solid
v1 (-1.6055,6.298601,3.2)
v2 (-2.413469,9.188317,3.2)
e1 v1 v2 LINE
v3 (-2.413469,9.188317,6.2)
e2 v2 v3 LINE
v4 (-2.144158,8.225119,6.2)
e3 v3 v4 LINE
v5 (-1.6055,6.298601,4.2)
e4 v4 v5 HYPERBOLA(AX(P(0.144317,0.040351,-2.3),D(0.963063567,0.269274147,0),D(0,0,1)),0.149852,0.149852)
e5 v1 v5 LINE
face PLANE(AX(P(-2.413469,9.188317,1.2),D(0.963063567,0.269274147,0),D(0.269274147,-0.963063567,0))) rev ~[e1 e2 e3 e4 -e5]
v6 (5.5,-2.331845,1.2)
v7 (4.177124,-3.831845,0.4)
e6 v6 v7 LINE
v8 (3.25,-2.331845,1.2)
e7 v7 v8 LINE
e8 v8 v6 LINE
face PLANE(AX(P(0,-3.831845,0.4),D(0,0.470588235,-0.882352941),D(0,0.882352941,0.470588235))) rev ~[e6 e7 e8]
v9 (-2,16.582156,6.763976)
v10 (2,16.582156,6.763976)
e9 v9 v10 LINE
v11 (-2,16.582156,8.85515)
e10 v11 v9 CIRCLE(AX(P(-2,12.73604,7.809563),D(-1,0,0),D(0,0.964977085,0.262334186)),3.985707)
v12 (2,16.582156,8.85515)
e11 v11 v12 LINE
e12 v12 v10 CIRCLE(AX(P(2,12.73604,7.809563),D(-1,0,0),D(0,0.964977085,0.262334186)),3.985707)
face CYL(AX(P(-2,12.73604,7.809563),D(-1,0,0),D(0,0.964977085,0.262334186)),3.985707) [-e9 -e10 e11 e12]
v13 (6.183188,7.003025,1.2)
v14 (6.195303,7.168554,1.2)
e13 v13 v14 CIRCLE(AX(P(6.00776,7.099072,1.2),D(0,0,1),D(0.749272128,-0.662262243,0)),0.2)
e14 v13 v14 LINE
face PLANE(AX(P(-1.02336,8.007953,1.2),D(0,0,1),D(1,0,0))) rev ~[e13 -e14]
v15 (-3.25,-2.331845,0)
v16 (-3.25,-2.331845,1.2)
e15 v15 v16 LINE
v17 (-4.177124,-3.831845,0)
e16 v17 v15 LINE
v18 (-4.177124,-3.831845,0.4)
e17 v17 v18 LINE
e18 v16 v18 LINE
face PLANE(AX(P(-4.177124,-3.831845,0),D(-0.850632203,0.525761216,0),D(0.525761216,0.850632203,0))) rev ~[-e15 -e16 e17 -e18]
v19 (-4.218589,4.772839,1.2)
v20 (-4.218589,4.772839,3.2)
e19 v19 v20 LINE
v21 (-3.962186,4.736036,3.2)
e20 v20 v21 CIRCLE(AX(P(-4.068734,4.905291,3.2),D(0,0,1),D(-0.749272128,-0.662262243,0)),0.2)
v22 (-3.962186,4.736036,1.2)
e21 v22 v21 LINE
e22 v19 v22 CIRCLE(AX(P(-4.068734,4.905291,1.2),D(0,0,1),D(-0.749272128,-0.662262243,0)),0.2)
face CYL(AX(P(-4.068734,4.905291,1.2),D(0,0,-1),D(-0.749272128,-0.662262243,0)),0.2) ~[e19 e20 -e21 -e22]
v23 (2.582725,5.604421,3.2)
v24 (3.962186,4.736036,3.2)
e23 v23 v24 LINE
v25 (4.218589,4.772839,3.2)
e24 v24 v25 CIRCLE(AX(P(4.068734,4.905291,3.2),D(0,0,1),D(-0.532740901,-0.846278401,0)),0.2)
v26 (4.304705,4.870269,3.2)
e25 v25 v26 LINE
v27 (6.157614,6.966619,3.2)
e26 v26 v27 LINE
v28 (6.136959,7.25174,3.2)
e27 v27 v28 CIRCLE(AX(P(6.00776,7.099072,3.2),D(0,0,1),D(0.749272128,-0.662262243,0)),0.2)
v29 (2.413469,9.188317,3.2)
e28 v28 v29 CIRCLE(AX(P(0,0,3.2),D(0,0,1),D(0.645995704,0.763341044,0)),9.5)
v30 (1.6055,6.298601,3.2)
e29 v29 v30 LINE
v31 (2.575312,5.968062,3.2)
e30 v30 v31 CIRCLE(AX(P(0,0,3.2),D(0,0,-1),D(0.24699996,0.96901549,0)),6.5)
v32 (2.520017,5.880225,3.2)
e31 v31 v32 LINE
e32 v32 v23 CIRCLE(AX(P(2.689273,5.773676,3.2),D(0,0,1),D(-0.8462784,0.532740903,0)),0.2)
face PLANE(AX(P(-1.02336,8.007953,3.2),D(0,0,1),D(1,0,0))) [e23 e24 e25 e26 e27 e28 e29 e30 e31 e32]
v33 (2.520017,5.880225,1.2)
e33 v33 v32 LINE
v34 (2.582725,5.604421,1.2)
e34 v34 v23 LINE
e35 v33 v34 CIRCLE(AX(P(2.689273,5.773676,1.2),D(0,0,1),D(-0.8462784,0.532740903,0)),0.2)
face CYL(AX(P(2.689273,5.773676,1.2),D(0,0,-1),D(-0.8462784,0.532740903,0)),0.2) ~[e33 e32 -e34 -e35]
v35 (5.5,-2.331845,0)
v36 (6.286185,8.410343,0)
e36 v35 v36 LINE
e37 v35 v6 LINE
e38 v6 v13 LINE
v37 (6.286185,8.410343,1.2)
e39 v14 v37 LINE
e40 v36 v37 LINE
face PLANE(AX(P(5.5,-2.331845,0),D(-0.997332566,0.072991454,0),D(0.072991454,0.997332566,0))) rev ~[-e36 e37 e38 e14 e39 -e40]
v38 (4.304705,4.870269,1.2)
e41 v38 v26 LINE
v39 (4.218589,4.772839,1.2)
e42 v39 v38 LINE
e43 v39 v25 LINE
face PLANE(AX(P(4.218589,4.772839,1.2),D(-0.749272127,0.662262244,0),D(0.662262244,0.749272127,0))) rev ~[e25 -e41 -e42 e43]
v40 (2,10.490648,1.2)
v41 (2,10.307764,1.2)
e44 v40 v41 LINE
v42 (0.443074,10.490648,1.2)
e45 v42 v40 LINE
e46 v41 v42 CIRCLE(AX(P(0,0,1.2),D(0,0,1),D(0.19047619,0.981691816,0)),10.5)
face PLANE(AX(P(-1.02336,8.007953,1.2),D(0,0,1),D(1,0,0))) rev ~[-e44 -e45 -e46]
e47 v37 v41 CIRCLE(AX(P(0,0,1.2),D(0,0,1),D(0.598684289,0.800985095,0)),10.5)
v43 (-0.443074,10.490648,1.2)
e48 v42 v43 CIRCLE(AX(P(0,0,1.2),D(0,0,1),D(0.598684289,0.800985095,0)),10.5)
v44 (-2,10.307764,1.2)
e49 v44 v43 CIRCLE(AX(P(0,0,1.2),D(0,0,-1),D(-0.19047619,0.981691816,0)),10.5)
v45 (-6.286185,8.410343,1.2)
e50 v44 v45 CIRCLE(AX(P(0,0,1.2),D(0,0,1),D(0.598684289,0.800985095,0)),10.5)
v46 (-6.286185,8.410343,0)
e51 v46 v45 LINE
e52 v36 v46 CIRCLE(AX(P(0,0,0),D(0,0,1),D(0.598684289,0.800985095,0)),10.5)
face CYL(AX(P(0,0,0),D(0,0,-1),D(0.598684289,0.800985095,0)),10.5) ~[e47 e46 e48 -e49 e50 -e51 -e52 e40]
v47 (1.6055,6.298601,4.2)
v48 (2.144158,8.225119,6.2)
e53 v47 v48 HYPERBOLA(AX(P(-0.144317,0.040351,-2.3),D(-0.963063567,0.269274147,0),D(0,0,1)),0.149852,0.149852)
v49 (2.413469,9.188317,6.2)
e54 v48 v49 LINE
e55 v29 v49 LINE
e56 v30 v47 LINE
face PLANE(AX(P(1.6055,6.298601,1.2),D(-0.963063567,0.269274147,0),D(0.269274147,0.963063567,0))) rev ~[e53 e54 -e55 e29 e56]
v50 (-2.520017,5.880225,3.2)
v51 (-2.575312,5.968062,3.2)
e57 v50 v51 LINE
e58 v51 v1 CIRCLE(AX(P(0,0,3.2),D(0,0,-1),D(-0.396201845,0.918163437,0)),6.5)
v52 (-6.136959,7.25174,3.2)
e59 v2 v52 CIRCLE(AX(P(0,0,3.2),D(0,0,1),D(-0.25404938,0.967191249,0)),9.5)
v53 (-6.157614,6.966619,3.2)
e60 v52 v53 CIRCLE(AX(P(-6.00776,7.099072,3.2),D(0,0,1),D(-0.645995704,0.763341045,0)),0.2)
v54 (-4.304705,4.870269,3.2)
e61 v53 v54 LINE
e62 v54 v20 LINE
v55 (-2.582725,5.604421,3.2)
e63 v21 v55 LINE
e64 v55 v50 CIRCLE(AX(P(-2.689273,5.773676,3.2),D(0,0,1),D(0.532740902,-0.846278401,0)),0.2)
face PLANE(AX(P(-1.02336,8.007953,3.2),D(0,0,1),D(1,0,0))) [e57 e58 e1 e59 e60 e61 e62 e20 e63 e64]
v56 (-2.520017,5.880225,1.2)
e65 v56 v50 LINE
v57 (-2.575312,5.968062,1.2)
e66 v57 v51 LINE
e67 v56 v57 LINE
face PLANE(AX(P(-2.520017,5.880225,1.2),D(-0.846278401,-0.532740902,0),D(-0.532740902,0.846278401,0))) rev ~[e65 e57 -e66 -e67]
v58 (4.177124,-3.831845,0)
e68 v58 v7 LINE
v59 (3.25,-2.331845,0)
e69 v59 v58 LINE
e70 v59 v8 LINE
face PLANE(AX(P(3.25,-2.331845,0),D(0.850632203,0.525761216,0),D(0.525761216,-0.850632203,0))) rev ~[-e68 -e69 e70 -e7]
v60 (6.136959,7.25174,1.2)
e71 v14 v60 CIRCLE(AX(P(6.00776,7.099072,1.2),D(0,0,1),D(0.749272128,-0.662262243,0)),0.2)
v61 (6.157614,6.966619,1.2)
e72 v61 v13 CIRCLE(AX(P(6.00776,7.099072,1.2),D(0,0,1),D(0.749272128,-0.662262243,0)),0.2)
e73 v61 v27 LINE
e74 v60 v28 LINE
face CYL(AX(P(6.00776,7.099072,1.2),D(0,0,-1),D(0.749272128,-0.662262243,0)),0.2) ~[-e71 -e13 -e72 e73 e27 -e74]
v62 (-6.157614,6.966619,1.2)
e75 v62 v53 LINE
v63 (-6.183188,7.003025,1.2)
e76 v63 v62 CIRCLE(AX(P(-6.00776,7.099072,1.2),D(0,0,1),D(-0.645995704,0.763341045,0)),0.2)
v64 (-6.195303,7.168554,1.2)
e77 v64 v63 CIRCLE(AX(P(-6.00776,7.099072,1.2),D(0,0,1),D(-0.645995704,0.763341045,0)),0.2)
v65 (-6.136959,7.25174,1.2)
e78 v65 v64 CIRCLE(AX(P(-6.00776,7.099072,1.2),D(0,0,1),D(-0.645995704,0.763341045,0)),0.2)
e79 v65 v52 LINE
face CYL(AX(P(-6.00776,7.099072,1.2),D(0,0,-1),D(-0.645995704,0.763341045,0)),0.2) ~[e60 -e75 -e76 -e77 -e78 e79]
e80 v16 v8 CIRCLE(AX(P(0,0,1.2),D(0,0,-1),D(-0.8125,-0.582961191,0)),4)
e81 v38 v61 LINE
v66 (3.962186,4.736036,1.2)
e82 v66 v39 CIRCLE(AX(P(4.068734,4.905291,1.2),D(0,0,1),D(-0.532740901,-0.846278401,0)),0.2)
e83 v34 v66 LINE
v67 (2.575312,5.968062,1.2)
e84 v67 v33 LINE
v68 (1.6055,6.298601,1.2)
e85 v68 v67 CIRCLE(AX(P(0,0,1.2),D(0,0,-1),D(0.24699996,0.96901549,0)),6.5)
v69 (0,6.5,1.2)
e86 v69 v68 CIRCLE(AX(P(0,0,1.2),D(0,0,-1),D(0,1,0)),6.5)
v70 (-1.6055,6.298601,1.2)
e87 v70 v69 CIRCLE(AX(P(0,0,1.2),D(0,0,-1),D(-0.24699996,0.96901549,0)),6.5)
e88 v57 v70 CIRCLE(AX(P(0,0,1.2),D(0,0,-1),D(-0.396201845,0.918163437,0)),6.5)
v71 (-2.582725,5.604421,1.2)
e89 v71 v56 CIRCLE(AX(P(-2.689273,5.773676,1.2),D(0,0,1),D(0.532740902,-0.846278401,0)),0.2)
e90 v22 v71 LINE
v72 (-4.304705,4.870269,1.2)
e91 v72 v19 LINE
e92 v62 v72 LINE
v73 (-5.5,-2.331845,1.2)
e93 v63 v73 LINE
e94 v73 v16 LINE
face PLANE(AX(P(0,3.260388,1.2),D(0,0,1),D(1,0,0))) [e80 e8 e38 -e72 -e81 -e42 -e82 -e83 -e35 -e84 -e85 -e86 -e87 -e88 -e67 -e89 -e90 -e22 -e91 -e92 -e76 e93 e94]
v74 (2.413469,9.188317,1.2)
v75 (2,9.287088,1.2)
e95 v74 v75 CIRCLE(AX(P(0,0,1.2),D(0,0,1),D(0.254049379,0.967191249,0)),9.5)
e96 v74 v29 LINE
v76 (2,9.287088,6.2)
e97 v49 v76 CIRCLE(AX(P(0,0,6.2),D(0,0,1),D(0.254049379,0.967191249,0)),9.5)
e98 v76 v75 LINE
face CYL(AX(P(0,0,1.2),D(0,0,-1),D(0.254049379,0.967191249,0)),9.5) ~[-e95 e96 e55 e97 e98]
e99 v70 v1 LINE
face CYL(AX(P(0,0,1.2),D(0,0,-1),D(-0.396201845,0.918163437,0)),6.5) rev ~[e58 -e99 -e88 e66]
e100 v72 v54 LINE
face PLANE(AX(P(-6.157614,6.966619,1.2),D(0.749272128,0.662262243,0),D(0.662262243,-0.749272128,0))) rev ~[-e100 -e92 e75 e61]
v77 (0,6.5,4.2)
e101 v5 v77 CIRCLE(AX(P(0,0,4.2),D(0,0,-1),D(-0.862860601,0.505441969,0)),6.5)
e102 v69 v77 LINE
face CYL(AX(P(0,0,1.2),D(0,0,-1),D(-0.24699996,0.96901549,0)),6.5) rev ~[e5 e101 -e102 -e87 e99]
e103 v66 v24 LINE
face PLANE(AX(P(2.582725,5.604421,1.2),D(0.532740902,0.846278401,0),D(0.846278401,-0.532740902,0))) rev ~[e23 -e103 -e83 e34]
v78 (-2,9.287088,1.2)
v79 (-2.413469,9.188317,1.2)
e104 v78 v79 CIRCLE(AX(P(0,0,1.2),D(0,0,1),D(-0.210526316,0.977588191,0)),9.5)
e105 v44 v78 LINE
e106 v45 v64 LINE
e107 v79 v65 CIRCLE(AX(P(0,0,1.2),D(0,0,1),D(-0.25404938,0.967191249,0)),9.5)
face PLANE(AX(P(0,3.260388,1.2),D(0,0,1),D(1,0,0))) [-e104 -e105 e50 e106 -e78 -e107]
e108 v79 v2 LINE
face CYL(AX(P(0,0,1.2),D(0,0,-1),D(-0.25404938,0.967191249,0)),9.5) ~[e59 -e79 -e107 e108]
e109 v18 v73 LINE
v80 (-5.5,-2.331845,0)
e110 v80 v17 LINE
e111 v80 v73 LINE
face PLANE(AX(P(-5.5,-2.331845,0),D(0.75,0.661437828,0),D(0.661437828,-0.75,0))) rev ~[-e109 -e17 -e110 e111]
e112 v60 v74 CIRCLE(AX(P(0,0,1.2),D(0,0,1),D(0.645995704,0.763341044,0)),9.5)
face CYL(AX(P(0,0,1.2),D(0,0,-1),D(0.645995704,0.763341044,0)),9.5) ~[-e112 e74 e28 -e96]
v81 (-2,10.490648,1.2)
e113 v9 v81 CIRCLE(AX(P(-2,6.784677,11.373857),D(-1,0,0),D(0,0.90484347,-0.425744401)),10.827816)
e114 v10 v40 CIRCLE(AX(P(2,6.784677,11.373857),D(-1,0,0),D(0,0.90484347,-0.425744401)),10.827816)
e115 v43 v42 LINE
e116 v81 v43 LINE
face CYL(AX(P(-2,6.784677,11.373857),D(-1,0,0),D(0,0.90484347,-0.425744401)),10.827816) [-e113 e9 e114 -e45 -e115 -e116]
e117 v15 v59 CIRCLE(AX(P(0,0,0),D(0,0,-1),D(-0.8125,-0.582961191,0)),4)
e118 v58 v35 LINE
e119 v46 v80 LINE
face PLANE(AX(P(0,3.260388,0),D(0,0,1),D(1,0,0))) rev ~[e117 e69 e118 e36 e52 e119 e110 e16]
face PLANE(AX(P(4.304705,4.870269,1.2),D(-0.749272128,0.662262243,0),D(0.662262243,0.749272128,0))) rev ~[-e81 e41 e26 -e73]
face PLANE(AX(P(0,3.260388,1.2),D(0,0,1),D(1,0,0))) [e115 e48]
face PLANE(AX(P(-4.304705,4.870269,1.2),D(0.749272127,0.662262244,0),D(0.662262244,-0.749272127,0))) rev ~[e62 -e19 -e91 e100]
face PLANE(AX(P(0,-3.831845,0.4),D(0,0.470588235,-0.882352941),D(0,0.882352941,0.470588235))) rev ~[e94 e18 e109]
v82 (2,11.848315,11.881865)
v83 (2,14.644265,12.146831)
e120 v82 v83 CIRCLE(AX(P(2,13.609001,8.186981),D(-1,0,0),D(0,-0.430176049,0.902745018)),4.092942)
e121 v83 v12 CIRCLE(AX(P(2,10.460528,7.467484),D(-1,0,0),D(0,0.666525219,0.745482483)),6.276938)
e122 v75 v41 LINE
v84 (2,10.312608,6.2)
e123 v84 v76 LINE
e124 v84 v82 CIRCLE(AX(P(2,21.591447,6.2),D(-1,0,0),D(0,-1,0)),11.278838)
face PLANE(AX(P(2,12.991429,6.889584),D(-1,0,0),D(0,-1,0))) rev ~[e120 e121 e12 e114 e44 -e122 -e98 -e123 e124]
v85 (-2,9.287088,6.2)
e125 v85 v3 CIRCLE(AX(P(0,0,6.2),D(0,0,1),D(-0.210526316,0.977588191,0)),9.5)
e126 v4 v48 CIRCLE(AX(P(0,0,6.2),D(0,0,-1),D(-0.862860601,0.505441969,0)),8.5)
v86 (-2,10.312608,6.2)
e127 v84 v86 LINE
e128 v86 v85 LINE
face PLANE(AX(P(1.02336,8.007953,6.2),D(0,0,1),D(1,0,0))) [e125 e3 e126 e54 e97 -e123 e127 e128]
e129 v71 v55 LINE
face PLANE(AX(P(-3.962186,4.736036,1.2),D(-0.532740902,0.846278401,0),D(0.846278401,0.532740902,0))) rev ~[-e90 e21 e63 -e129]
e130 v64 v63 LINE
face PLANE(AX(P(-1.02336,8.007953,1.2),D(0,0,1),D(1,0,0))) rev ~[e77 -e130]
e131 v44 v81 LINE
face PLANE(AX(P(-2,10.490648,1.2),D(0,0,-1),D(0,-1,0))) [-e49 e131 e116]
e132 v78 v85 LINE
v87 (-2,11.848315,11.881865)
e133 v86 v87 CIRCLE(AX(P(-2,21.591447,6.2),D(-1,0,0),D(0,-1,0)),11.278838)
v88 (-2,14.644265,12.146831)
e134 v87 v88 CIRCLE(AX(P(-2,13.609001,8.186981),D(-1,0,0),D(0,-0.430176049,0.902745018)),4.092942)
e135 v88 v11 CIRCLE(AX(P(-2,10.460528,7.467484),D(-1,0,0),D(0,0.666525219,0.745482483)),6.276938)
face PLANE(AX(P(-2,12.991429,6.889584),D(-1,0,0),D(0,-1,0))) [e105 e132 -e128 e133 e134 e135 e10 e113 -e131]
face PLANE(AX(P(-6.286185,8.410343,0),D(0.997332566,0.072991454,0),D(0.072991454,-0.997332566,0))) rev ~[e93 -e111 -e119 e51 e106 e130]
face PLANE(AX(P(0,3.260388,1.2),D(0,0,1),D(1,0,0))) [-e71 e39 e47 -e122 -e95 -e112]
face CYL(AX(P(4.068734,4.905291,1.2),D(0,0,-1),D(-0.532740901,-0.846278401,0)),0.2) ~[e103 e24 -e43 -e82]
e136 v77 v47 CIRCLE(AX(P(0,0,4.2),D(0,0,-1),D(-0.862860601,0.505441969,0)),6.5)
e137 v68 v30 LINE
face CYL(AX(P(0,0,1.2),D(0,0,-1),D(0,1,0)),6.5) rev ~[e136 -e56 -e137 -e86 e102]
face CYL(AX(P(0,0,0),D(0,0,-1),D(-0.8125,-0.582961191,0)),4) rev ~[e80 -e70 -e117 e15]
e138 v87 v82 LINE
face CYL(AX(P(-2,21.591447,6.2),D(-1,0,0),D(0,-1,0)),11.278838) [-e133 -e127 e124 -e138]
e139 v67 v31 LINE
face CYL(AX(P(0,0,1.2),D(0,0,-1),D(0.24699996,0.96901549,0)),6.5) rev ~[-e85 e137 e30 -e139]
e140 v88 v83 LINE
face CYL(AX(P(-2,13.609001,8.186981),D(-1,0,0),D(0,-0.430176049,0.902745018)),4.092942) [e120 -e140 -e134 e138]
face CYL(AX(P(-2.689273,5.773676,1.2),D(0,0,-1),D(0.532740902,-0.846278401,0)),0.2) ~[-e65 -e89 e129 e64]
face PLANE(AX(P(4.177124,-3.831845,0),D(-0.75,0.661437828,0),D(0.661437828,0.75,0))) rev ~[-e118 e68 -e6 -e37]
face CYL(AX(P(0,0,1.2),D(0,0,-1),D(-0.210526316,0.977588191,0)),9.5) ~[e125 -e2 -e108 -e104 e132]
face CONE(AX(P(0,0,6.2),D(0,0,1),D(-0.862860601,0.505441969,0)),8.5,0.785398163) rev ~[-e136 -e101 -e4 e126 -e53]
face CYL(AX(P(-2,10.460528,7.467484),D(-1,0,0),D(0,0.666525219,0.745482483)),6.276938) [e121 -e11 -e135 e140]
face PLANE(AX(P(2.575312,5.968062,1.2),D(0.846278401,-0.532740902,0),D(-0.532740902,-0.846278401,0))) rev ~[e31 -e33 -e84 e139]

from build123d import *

# Parameters (mm, degrees)
F1_DEPTH    = 1.2
F3_DEPTH    = 12.5
F5_DEPTH    = 2
F6_DEPTH    = 5
F7_T2_ANGLE = 119.2786087223
F8_DEPTH    = 5
F10_DEPTH   = 4
F11_DEPTH   = 5


# Not quite as in the source:
# - a fillet or chamfer that OpenCascade refuses, or shapes differently, is made with other operations: its cross-section is extruded or revolved along the edge and cut away or added
# - a feature names something its author has since deleted; it is built from what else it names


with BuildPart() as f1:
    # F0 (on Top) → F1 (new body)
    with BuildSketch(Plane.XY):
        with BuildLine():
            ThreePointArc((-3.25, -2.3318447633), (0, 4), (3.25, -2.3318447633))
            Line((3.25, -2.3318447633), (4.1771243445, -3.8318447633))
            Line((4.1771243445, -3.8318447633), (5.5, -2.3318447633))
            Line((5.5, -2.3318447633), (6.2861850371, 8.4103434936))
            ThreePointArc((6.2861850371, 8.4103434936), (0, 10.5), (-6.2861850371, 8.4103434936))
            Line((-6.2861850371, 8.4103434936), (-5.5, -2.3318447633))
            Line((-5.5, -2.3318447633), (-4.1771243445, -3.8318447633))
            Line((-4.1771243445, -3.8318447633), (-3.25, -2.3318447633))
        make_face()
    extrude(amount=F1_DEPTH)

    # F2 (on Right) → F3 (cut, symmetric)
    with BuildSketch(Plane.YZ):
        Polygon((-3.8318447633, 0.4), (-2.3318447633, 1.2), (-3.8318447633, 1.2), align=None)
    extrude(amount=F3_DEPTH, both=True, mode=Mode.SUBTRACT)

    # F4 (on face) → F5 (join)
    with BuildSketch(Plane.XY.offset(1.2)):
        with BuildLine():
            Line((0, 9.4893432962), (0, 9.5))
            ThreePointArc((0, 9.5), (-1.0056504861, 9.4466219941), (-2, 9.2870878105))
            ThreePointArc((-2, 9.2870878105), (-2.207287093, 9.2400153511), (-2.4134691055, 9.1883168686))
            Line((-2.4134691055, 9.1883168686), (-1.6054997382, 6.2986006851))
            ThreePointArc((-1.6054997382, 6.2986006851), (-0.809041268, 6.4494536378), (0, 6.5))
            Line((0, 6.5), (0, 9.4893432962))
        make_face()
        with BuildLine():
            Line((0, 10.3126084432), (0, 9.5))
            ThreePointArc((0, 9.5), (1.0056504861, 9.4466219941), (2, 9.2870878105))
            Line((2, 9.2870878105), (2, 10.3126084432))
            Line((2, 10.3126084432), (0, 10.3126084432))
        make_face()
        with BuildLine():
            ThreePointArc((2, 9.2870878105), (1.0056504861, 9.4466219941), (0, 9.5))
            Line((0, 9.5), (0, 9.4893432962))
            Line((0, 9.4893432962), (0, 6.5))
            ThreePointArc((0, 6.5), (0.809041268, 6.4494536378), (1.6054997382, 6.2986006851))
            Line((1.6054997382, 6.2986006851), (2.4134691055, 9.1883168686))
            ThreePointArc((2.4134691055, 9.1883168686), (2.207287093, 9.2400153511), (2, 9.2870878105))
        make_face()
        with BuildLine():
            ThreePointArc((-2, 9.2870878105), (-1.0056504861, 9.4466219941), (0, 9.5))
            Line((0, 9.5), (0, 10.3126084432))
            Line((0, 10.3126084432), (-2, 10.3126084432))
            Line((-2, 10.3126084432), (-2, 9.2870878105))
        make_face()
        with BuildLine():
            Line((-1.6054997382, 6.2986006851), (-2.4134691055, 9.1883168686))
            ThreePointArc((-2.4134691055, 9.1883168686), (-4.3834961594, 8.4282240965), (-6.1369591907, 7.2517399217))
            ThreePointArc((-6.1369591907, 7.2517399217), (-6.2072372931, 7.1135226449), (-6.1576144754, 6.9666192642))
            Line((-6.1576144754, 6.9666192642), (-4.3047045796, 4.8702688306))
            Line((-4.3047045796, 4.8702688306), (-4.2185888433, 4.7728389657))
            ThreePointArc((-4.2185888433, 4.7728389657), (-4.0971505607, 4.7073203992), (-3.9621862374, 4.7360357341))
            Line((-3.9621862374, 4.7360357341), (-2.5827247856, 5.6044208159))
            ThreePointArc((-2.5827247856, 5.6044208159), (-2.4942501859, 5.7293355978), (-2.5200172859, 5.8802246764))
            Line((-2.5200172859, 5.8802246764), (-2.5753119947, 5.968062343))
            ThreePointArc((-2.5753119947, 5.968062343), (-2.096928846, 6.152470188), (-1.6054997382, 6.2986006851))
        make_face()
        with BuildLine():
            ThreePointArc((6.1369591907, 7.2517399217), (4.3834961594, 8.4282240965), (2.4134691055, 9.1883168686))
            Line((2.4134691055, 9.1883168686), (1.6054997382, 6.2986006851))
            ThreePointArc((1.6054997382, 6.2986006851), (2.096928846, 6.152470188), (2.5753119947, 5.968062343))
            Line((2.5753119947, 5.968062343), (2.5200172859, 5.8802246764))
            ThreePointArc((2.5200172859, 5.8802246764), (2.4942501859, 5.7293355978), (2.5827247856, 5.6044208159))
            Line((2.5827247856, 5.6044208159), (3.9621862374, 4.7360357341))
            ThreePointArc((3.9621862374, 4.7360357341), (4.0971505607, 4.7073203992), (4.2185888433, 4.7728389657))
            Line((4.2185888433, 4.7728389657), (4.3047045796, 4.8702688306))
            Line((4.3047045796, 4.8702688306), (6.1576144754, 6.9666192642))
            ThreePointArc((6.1576144754, 6.9666192642), (6.2072372931, 7.1135226449), (6.1369591907, 7.2517399217))
        make_face()
    extrude(amount=F5_DEPTH)

    # F4 (on face) → F6 (join)
    with BuildSketch(Plane.XY.offset(1.2)):
        with BuildLine():
            ThreePointArc((2, 9.2870878105), (1.0056504861, 9.4466219941), (0, 9.5))
            Line((0, 9.5), (0, 9.4893432962))
            Line((0, 9.4893432962), (0, 6.5))
            ThreePointArc((0, 6.5), (0.809041268, 6.4494536378), (1.6054997382, 6.2986006851))
            Line((1.6054997382, 6.2986006851), (2.4134691055, 9.1883168686))
            ThreePointArc((2.4134691055, 9.1883168686), (2.207287093, 9.2400153511), (2, 9.2870878105))
        make_face()
        with BuildLine():
            Line((0, 9.4893432962), (0, 9.5))
            ThreePointArc((0, 9.5), (-1.0056504861, 9.4466219941), (-2, 9.2870878105))
            ThreePointArc((-2, 9.2870878105), (-2.207287093, 9.2400153511), (-2.4134691055, 9.1883168686))
            Line((-2.4134691055, 9.1883168686), (-1.6054997382, 6.2986006851))
            ThreePointArc((-1.6054997382, 6.2986006851), (-0.809041268, 6.4494536378), (0, 6.5))
            Line((0, 6.5), (0, 9.4893432962))
        make_face()
    extrude(amount=F6_DEPTH)

    # F7: chamfer of 2 on 1 edges, made by hand

    # F7_s1 → F7_t2 (revolve, cut)
    with BuildSketch(Plane(origin=(0, 0, 0), x_dir=(0, 0, 1), z_dir=(-0.5054419689, -0.8628606006, 0))):
        Polygon((6.2, 8.5), (4.2, 6.5), (6.2, 6.5), align=None)
    revolve(axis=Axis((0, 0, 6.2), (0, 0, -1)), revolution_arc=F7_T2_ANGLE, mode=Mode.SUBTRACT)

    # F4 (on face) → F8 (join, through all)
    with BuildSketch(Plane.XY.offset(1.2)):
        with BuildLine():
            Line((0, 10.3126084432), (0, 9.5))
            ThreePointArc((0, 9.5), (1.0056504861, 9.4466219941), (2, 9.2870878105))
            Line((2, 9.2870878105), (2, 10.307764064))
            ThreePointArc((2, 10.307764064), (1.9874359165, 10.3101939108), (1.974868881, 10.3126084432))
            Line((1.974868881, 10.3126084432), (0, 10.3126084432))
        make_face()
        with BuildLine():
            ThreePointArc((1.974868881, 10.3126084432), (1.9874359165, 10.3101939108), (2, 10.307764064))
            Line((2, 10.307764064), (2, 10.3126084432))
            Line((2, 10.3126084432), (1.974868881, 10.3126084432))
        make_face()
        with BuildLine():
            Line((-2, 10.3126084432), (-2, 10.307764064))
            ThreePointArc((-2, 10.307764064), (-1.9874359165, 10.3101939108), (-1.974868881, 10.3126084432))
            Line((-1.974868881, 10.3126084432), (-2, 10.3126084432))
        make_face()
        with BuildLine():
            ThreePointArc((-2, 9.2870878105), (-1.0056504861, 9.4466219941), (0, 9.5))
            Line((0, 9.5), (0, 10.3126084432))
            Line((0, 10.3126084432), (-1.974868881, 10.3126084432))
            ThreePointArc((-1.974868881, 10.3126084432), (-1.9874359165, 10.3101939108), (-2, 10.307764064))
            Line((-2, 10.307764064), (-2, 9.2870878105))
        make_face()
    extrude(amount=F8_DEPTH)

    # F9 (on face) → F10 (join)
    with BuildSketch(Plane(origin=(-2, 0, 0), x_dir=(0, -1, 0), z_dir=(-1, 0, 0))):
        with BuildLine():
            Line((-10.4906475171, 1.2), (-10.3126084432, 1.2))
            Line((-10.3126084432, 1.2), (-10.3126084432, 6.2))
            ThreePointArc((-10.3126084432, 6.2), (-10.7033019047, 9.142871965), (-11.848315427, 11.8818646297))
            ThreePointArc((-11.848315427, 11.8818646297), (-13.2228522743, 12.2616673302), (-14.6442650052, 12.1468305588))
            ThreePointArc((-14.6442650052, 12.1468305588), (-15.8696799602, 10.6519801079), (-16.5821556002, 8.8551500812))
            ThreePointArc((-16.5821556002, 8.8551500812), (-16.7217466821, 7.8095628414), (-16.5821556002, 6.7639756016))
            ThreePointArc((-16.5821556002, 6.7639756016), (-14.0870903715, 3.3790869985), (-10.4906475171, 1.2))
        make_face()
    extrude(amount=-F10_DEPTH)

    # F4 (on face) → F11 (join, through all)
    with BuildSketch(Plane.XY.offset(1.2)):
        with BuildLine():
            Line((0, 10.3126084432), (0, 9.5))
            ThreePointArc((0, 9.5), (1.0056504861, 9.4466219941), (2, 9.2870878105))
            Line((2, 9.2870878105), (2, 10.307764064))
            ThreePointArc((2, 10.307764064), (1.9874359165, 10.3101939108), (1.974868881, 10.3126084432))
            Line((1.974868881, 10.3126084432), (0, 10.3126084432))
        make_face()
        with BuildLine():
            ThreePointArc((-2, 9.2870878105), (-1.0056504861, 9.4466219941), (0, 9.5))
            Line((0, 9.5), (0, 10.3126084432))
            Line((0, 10.3126084432), (-1.974868881, 10.3126084432))
            ThreePointArc((-1.974868881, 10.3126084432), (-1.9874359165, 10.3101939108), (-2, 10.307764064))
            Line((-2, 10.307764064), (-2, 9.2870878105))
        make_face()
    extrude(amount=F11_DEPTH)


solid = f1.part
